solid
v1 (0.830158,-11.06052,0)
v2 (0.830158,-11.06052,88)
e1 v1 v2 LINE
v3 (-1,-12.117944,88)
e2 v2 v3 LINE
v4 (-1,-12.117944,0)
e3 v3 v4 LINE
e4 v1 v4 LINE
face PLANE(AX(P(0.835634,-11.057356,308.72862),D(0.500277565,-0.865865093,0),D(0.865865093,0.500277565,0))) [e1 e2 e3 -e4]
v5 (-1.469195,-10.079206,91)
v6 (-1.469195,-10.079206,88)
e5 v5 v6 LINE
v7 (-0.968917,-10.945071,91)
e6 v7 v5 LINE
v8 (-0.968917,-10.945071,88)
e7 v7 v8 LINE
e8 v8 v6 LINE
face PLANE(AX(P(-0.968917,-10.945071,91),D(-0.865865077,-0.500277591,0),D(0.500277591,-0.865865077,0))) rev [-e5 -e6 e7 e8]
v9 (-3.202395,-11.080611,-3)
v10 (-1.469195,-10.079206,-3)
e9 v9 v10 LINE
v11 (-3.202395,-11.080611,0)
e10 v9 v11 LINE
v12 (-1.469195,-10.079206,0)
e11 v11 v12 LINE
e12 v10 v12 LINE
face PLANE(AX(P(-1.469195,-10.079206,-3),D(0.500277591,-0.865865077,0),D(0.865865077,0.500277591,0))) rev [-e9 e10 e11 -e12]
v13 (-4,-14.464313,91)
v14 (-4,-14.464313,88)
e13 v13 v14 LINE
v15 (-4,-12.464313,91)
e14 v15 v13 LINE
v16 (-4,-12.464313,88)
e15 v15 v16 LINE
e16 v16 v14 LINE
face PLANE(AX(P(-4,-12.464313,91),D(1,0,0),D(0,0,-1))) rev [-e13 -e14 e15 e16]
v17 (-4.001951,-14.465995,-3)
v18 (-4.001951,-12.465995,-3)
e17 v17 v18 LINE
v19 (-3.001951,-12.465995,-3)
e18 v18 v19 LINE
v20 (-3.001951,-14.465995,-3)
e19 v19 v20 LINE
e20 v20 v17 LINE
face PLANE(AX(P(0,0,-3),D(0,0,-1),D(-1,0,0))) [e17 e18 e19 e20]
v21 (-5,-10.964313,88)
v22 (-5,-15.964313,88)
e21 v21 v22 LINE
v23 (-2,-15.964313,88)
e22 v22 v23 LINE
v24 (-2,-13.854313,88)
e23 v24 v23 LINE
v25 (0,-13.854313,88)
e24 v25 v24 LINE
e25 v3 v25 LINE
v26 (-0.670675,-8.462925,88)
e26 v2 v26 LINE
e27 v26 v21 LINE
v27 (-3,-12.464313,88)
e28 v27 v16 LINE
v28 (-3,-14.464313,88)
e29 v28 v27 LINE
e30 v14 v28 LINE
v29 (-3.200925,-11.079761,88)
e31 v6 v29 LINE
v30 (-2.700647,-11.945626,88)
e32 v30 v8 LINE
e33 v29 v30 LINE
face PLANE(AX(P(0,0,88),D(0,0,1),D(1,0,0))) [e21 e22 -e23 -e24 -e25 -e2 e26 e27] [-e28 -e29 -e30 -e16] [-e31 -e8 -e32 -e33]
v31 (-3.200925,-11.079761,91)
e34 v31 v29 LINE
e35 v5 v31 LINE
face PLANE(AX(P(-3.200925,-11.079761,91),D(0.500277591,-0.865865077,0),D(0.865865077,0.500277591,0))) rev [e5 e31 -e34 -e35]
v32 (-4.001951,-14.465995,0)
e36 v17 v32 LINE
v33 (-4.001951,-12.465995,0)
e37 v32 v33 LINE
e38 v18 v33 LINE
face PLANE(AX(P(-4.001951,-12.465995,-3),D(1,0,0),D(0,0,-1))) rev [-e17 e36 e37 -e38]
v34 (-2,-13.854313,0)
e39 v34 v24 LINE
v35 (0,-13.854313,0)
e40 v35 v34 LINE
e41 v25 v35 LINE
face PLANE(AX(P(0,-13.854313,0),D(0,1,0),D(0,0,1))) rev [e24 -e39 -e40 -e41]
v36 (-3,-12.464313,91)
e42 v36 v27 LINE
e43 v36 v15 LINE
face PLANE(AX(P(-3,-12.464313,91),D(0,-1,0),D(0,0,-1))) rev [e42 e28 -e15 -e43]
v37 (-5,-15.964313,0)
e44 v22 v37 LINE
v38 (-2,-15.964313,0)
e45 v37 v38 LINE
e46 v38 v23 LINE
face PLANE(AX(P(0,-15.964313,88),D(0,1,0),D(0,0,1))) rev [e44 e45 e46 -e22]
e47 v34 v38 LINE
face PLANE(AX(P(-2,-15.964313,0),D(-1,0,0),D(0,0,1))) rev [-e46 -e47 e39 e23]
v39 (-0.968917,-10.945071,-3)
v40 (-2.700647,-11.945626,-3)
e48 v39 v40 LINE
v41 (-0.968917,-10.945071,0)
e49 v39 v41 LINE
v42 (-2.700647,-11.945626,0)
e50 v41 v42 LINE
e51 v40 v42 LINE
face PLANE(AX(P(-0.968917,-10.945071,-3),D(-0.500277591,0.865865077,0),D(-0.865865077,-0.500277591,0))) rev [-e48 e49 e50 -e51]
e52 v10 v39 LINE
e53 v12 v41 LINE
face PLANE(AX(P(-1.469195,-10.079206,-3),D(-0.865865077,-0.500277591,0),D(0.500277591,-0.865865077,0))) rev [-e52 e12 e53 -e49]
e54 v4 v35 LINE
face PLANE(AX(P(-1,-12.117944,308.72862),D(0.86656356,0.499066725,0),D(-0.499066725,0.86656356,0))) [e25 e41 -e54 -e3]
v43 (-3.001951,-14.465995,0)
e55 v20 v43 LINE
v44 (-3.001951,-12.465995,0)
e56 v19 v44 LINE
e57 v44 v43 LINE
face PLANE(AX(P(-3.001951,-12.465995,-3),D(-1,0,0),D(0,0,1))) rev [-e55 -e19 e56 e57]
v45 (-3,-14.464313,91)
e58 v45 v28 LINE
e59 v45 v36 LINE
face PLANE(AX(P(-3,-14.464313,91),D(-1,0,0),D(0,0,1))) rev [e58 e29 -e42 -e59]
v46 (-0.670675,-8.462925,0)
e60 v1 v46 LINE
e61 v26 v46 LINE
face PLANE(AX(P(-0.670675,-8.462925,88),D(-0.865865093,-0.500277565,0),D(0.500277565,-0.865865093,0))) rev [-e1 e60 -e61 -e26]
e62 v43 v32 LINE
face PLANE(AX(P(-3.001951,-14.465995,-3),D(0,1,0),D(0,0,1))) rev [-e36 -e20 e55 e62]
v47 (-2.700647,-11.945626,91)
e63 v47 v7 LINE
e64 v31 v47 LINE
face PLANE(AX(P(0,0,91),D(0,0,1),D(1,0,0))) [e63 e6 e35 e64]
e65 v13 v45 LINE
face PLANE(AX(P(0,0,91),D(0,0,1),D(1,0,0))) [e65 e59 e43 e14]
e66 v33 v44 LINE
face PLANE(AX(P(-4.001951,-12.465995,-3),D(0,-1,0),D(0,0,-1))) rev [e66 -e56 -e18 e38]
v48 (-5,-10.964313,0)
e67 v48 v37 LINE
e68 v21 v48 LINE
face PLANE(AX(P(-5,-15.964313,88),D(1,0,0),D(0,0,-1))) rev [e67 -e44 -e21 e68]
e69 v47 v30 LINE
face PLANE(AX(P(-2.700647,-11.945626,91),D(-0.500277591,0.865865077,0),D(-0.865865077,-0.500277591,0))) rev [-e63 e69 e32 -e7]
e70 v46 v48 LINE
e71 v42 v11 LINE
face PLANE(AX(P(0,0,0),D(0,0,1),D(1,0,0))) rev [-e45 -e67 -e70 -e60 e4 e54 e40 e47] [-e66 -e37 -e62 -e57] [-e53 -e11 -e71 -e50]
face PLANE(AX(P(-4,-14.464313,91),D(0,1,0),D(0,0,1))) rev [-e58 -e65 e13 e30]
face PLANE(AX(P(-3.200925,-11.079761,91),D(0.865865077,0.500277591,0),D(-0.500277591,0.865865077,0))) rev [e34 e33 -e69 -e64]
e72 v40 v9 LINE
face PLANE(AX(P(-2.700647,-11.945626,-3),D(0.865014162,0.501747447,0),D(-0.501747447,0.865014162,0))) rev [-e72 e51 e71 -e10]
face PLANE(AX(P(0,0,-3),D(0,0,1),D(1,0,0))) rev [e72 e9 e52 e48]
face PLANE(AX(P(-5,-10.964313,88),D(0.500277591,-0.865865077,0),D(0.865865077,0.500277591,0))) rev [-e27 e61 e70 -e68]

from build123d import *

# Parameters (mm, degrees)
BOSS_EXTRUDE1_DEPTH = 88
SKETCH3_W           = 2
SKETCH3_H           = 2.11
CUT_EXTRUDE1_DEPTH  = 88
CUT_EXTRUDE3_START  = -88
CUT_EXTRUDE3_DEPTH  = 88
SKETCH5_W           = 1
SKETCH5_H           = 2
BOSS_EXTRUDE2_DEPTH = 3
SKETCH6_W           = 1
SKETCH6_H           = 2
BOSS_EXTRUDE3_DEPTH = 3


# Read off the part's stored shape, not the designer's step: Cut-Extrude3
with BuildPart() as part:
    # Sketch1 → Boss-Extrude1 (new body)
    with BuildSketch(Plane.XY):
        Polygon((0, -15.964312624), (-5, -15.964312624), (-5, -10.964312624), (-0.670674615, -8.462924667), (1.830713193, -12.792250104), (0, -13.854312624), align=None)
    extrude(amount=BOSS_EXTRUDE1_DEPTH)

    # Sketch3 → Cut-Extrude1 (cut)
    with BuildSketch(Plane.XY.offset(88)):
        with Locations((-1, -14.909312624)):
            Rectangle(SKETCH3_W, SKETCH3_H)
    extrude(amount=-CUT_EXTRUDE1_DEPTH, mode=Mode.SUBTRACT)

    # Cut-Extrude3 outline → Cut-Extrude3 (cut)
    with BuildSketch(Plane.XY.offset(88).offset(CUT_EXTRUDE3_START)):
        Polygon((0.830158064, -11.060519919), (-1, -12.117944485), (0, -13.854312624), (1.830713193, -12.792250104), align=None)
    extrude(amount=CUT_EXTRUDE3_DEPTH, mode=Mode.SUBTRACT)

    # Sketch5 → Boss-Extrude2 (add)
    with BuildSketch(Plane.XY.offset(88)):
        Polygon((-3.200924793, -11.079761314), (-1.469194639, -10.079206131), (-0.968917048, -10.945071208), (-2.700647202, -11.945626391), align=None)
        with Locations((-3.5, -13.464312624)):
            Rectangle(SKETCH5_W, SKETCH5_H)
    extrude(amount=BOSS_EXTRUDE2_DEPTH)

    # Sketch6 → Boss-Extrude3 (add)
    with BuildSketch(Plane(origin=(0, 0, 0), x_dir=(-1, 0, 0), z_dir=(0, 0, -1))):
        Polygon((1.469194639, -10.079206131), (0.968917048, -10.945071208), (2.700647202, -11.945626391), (3.202395372, -11.080610981), align=None)
        with Locations((3.501951466, -13.465994689)):
            Rectangle(SKETCH6_W, SKETCH6_H)
    extrude(amount=BOSS_EXTRUDE3_DEPTH)


solid = part.part
